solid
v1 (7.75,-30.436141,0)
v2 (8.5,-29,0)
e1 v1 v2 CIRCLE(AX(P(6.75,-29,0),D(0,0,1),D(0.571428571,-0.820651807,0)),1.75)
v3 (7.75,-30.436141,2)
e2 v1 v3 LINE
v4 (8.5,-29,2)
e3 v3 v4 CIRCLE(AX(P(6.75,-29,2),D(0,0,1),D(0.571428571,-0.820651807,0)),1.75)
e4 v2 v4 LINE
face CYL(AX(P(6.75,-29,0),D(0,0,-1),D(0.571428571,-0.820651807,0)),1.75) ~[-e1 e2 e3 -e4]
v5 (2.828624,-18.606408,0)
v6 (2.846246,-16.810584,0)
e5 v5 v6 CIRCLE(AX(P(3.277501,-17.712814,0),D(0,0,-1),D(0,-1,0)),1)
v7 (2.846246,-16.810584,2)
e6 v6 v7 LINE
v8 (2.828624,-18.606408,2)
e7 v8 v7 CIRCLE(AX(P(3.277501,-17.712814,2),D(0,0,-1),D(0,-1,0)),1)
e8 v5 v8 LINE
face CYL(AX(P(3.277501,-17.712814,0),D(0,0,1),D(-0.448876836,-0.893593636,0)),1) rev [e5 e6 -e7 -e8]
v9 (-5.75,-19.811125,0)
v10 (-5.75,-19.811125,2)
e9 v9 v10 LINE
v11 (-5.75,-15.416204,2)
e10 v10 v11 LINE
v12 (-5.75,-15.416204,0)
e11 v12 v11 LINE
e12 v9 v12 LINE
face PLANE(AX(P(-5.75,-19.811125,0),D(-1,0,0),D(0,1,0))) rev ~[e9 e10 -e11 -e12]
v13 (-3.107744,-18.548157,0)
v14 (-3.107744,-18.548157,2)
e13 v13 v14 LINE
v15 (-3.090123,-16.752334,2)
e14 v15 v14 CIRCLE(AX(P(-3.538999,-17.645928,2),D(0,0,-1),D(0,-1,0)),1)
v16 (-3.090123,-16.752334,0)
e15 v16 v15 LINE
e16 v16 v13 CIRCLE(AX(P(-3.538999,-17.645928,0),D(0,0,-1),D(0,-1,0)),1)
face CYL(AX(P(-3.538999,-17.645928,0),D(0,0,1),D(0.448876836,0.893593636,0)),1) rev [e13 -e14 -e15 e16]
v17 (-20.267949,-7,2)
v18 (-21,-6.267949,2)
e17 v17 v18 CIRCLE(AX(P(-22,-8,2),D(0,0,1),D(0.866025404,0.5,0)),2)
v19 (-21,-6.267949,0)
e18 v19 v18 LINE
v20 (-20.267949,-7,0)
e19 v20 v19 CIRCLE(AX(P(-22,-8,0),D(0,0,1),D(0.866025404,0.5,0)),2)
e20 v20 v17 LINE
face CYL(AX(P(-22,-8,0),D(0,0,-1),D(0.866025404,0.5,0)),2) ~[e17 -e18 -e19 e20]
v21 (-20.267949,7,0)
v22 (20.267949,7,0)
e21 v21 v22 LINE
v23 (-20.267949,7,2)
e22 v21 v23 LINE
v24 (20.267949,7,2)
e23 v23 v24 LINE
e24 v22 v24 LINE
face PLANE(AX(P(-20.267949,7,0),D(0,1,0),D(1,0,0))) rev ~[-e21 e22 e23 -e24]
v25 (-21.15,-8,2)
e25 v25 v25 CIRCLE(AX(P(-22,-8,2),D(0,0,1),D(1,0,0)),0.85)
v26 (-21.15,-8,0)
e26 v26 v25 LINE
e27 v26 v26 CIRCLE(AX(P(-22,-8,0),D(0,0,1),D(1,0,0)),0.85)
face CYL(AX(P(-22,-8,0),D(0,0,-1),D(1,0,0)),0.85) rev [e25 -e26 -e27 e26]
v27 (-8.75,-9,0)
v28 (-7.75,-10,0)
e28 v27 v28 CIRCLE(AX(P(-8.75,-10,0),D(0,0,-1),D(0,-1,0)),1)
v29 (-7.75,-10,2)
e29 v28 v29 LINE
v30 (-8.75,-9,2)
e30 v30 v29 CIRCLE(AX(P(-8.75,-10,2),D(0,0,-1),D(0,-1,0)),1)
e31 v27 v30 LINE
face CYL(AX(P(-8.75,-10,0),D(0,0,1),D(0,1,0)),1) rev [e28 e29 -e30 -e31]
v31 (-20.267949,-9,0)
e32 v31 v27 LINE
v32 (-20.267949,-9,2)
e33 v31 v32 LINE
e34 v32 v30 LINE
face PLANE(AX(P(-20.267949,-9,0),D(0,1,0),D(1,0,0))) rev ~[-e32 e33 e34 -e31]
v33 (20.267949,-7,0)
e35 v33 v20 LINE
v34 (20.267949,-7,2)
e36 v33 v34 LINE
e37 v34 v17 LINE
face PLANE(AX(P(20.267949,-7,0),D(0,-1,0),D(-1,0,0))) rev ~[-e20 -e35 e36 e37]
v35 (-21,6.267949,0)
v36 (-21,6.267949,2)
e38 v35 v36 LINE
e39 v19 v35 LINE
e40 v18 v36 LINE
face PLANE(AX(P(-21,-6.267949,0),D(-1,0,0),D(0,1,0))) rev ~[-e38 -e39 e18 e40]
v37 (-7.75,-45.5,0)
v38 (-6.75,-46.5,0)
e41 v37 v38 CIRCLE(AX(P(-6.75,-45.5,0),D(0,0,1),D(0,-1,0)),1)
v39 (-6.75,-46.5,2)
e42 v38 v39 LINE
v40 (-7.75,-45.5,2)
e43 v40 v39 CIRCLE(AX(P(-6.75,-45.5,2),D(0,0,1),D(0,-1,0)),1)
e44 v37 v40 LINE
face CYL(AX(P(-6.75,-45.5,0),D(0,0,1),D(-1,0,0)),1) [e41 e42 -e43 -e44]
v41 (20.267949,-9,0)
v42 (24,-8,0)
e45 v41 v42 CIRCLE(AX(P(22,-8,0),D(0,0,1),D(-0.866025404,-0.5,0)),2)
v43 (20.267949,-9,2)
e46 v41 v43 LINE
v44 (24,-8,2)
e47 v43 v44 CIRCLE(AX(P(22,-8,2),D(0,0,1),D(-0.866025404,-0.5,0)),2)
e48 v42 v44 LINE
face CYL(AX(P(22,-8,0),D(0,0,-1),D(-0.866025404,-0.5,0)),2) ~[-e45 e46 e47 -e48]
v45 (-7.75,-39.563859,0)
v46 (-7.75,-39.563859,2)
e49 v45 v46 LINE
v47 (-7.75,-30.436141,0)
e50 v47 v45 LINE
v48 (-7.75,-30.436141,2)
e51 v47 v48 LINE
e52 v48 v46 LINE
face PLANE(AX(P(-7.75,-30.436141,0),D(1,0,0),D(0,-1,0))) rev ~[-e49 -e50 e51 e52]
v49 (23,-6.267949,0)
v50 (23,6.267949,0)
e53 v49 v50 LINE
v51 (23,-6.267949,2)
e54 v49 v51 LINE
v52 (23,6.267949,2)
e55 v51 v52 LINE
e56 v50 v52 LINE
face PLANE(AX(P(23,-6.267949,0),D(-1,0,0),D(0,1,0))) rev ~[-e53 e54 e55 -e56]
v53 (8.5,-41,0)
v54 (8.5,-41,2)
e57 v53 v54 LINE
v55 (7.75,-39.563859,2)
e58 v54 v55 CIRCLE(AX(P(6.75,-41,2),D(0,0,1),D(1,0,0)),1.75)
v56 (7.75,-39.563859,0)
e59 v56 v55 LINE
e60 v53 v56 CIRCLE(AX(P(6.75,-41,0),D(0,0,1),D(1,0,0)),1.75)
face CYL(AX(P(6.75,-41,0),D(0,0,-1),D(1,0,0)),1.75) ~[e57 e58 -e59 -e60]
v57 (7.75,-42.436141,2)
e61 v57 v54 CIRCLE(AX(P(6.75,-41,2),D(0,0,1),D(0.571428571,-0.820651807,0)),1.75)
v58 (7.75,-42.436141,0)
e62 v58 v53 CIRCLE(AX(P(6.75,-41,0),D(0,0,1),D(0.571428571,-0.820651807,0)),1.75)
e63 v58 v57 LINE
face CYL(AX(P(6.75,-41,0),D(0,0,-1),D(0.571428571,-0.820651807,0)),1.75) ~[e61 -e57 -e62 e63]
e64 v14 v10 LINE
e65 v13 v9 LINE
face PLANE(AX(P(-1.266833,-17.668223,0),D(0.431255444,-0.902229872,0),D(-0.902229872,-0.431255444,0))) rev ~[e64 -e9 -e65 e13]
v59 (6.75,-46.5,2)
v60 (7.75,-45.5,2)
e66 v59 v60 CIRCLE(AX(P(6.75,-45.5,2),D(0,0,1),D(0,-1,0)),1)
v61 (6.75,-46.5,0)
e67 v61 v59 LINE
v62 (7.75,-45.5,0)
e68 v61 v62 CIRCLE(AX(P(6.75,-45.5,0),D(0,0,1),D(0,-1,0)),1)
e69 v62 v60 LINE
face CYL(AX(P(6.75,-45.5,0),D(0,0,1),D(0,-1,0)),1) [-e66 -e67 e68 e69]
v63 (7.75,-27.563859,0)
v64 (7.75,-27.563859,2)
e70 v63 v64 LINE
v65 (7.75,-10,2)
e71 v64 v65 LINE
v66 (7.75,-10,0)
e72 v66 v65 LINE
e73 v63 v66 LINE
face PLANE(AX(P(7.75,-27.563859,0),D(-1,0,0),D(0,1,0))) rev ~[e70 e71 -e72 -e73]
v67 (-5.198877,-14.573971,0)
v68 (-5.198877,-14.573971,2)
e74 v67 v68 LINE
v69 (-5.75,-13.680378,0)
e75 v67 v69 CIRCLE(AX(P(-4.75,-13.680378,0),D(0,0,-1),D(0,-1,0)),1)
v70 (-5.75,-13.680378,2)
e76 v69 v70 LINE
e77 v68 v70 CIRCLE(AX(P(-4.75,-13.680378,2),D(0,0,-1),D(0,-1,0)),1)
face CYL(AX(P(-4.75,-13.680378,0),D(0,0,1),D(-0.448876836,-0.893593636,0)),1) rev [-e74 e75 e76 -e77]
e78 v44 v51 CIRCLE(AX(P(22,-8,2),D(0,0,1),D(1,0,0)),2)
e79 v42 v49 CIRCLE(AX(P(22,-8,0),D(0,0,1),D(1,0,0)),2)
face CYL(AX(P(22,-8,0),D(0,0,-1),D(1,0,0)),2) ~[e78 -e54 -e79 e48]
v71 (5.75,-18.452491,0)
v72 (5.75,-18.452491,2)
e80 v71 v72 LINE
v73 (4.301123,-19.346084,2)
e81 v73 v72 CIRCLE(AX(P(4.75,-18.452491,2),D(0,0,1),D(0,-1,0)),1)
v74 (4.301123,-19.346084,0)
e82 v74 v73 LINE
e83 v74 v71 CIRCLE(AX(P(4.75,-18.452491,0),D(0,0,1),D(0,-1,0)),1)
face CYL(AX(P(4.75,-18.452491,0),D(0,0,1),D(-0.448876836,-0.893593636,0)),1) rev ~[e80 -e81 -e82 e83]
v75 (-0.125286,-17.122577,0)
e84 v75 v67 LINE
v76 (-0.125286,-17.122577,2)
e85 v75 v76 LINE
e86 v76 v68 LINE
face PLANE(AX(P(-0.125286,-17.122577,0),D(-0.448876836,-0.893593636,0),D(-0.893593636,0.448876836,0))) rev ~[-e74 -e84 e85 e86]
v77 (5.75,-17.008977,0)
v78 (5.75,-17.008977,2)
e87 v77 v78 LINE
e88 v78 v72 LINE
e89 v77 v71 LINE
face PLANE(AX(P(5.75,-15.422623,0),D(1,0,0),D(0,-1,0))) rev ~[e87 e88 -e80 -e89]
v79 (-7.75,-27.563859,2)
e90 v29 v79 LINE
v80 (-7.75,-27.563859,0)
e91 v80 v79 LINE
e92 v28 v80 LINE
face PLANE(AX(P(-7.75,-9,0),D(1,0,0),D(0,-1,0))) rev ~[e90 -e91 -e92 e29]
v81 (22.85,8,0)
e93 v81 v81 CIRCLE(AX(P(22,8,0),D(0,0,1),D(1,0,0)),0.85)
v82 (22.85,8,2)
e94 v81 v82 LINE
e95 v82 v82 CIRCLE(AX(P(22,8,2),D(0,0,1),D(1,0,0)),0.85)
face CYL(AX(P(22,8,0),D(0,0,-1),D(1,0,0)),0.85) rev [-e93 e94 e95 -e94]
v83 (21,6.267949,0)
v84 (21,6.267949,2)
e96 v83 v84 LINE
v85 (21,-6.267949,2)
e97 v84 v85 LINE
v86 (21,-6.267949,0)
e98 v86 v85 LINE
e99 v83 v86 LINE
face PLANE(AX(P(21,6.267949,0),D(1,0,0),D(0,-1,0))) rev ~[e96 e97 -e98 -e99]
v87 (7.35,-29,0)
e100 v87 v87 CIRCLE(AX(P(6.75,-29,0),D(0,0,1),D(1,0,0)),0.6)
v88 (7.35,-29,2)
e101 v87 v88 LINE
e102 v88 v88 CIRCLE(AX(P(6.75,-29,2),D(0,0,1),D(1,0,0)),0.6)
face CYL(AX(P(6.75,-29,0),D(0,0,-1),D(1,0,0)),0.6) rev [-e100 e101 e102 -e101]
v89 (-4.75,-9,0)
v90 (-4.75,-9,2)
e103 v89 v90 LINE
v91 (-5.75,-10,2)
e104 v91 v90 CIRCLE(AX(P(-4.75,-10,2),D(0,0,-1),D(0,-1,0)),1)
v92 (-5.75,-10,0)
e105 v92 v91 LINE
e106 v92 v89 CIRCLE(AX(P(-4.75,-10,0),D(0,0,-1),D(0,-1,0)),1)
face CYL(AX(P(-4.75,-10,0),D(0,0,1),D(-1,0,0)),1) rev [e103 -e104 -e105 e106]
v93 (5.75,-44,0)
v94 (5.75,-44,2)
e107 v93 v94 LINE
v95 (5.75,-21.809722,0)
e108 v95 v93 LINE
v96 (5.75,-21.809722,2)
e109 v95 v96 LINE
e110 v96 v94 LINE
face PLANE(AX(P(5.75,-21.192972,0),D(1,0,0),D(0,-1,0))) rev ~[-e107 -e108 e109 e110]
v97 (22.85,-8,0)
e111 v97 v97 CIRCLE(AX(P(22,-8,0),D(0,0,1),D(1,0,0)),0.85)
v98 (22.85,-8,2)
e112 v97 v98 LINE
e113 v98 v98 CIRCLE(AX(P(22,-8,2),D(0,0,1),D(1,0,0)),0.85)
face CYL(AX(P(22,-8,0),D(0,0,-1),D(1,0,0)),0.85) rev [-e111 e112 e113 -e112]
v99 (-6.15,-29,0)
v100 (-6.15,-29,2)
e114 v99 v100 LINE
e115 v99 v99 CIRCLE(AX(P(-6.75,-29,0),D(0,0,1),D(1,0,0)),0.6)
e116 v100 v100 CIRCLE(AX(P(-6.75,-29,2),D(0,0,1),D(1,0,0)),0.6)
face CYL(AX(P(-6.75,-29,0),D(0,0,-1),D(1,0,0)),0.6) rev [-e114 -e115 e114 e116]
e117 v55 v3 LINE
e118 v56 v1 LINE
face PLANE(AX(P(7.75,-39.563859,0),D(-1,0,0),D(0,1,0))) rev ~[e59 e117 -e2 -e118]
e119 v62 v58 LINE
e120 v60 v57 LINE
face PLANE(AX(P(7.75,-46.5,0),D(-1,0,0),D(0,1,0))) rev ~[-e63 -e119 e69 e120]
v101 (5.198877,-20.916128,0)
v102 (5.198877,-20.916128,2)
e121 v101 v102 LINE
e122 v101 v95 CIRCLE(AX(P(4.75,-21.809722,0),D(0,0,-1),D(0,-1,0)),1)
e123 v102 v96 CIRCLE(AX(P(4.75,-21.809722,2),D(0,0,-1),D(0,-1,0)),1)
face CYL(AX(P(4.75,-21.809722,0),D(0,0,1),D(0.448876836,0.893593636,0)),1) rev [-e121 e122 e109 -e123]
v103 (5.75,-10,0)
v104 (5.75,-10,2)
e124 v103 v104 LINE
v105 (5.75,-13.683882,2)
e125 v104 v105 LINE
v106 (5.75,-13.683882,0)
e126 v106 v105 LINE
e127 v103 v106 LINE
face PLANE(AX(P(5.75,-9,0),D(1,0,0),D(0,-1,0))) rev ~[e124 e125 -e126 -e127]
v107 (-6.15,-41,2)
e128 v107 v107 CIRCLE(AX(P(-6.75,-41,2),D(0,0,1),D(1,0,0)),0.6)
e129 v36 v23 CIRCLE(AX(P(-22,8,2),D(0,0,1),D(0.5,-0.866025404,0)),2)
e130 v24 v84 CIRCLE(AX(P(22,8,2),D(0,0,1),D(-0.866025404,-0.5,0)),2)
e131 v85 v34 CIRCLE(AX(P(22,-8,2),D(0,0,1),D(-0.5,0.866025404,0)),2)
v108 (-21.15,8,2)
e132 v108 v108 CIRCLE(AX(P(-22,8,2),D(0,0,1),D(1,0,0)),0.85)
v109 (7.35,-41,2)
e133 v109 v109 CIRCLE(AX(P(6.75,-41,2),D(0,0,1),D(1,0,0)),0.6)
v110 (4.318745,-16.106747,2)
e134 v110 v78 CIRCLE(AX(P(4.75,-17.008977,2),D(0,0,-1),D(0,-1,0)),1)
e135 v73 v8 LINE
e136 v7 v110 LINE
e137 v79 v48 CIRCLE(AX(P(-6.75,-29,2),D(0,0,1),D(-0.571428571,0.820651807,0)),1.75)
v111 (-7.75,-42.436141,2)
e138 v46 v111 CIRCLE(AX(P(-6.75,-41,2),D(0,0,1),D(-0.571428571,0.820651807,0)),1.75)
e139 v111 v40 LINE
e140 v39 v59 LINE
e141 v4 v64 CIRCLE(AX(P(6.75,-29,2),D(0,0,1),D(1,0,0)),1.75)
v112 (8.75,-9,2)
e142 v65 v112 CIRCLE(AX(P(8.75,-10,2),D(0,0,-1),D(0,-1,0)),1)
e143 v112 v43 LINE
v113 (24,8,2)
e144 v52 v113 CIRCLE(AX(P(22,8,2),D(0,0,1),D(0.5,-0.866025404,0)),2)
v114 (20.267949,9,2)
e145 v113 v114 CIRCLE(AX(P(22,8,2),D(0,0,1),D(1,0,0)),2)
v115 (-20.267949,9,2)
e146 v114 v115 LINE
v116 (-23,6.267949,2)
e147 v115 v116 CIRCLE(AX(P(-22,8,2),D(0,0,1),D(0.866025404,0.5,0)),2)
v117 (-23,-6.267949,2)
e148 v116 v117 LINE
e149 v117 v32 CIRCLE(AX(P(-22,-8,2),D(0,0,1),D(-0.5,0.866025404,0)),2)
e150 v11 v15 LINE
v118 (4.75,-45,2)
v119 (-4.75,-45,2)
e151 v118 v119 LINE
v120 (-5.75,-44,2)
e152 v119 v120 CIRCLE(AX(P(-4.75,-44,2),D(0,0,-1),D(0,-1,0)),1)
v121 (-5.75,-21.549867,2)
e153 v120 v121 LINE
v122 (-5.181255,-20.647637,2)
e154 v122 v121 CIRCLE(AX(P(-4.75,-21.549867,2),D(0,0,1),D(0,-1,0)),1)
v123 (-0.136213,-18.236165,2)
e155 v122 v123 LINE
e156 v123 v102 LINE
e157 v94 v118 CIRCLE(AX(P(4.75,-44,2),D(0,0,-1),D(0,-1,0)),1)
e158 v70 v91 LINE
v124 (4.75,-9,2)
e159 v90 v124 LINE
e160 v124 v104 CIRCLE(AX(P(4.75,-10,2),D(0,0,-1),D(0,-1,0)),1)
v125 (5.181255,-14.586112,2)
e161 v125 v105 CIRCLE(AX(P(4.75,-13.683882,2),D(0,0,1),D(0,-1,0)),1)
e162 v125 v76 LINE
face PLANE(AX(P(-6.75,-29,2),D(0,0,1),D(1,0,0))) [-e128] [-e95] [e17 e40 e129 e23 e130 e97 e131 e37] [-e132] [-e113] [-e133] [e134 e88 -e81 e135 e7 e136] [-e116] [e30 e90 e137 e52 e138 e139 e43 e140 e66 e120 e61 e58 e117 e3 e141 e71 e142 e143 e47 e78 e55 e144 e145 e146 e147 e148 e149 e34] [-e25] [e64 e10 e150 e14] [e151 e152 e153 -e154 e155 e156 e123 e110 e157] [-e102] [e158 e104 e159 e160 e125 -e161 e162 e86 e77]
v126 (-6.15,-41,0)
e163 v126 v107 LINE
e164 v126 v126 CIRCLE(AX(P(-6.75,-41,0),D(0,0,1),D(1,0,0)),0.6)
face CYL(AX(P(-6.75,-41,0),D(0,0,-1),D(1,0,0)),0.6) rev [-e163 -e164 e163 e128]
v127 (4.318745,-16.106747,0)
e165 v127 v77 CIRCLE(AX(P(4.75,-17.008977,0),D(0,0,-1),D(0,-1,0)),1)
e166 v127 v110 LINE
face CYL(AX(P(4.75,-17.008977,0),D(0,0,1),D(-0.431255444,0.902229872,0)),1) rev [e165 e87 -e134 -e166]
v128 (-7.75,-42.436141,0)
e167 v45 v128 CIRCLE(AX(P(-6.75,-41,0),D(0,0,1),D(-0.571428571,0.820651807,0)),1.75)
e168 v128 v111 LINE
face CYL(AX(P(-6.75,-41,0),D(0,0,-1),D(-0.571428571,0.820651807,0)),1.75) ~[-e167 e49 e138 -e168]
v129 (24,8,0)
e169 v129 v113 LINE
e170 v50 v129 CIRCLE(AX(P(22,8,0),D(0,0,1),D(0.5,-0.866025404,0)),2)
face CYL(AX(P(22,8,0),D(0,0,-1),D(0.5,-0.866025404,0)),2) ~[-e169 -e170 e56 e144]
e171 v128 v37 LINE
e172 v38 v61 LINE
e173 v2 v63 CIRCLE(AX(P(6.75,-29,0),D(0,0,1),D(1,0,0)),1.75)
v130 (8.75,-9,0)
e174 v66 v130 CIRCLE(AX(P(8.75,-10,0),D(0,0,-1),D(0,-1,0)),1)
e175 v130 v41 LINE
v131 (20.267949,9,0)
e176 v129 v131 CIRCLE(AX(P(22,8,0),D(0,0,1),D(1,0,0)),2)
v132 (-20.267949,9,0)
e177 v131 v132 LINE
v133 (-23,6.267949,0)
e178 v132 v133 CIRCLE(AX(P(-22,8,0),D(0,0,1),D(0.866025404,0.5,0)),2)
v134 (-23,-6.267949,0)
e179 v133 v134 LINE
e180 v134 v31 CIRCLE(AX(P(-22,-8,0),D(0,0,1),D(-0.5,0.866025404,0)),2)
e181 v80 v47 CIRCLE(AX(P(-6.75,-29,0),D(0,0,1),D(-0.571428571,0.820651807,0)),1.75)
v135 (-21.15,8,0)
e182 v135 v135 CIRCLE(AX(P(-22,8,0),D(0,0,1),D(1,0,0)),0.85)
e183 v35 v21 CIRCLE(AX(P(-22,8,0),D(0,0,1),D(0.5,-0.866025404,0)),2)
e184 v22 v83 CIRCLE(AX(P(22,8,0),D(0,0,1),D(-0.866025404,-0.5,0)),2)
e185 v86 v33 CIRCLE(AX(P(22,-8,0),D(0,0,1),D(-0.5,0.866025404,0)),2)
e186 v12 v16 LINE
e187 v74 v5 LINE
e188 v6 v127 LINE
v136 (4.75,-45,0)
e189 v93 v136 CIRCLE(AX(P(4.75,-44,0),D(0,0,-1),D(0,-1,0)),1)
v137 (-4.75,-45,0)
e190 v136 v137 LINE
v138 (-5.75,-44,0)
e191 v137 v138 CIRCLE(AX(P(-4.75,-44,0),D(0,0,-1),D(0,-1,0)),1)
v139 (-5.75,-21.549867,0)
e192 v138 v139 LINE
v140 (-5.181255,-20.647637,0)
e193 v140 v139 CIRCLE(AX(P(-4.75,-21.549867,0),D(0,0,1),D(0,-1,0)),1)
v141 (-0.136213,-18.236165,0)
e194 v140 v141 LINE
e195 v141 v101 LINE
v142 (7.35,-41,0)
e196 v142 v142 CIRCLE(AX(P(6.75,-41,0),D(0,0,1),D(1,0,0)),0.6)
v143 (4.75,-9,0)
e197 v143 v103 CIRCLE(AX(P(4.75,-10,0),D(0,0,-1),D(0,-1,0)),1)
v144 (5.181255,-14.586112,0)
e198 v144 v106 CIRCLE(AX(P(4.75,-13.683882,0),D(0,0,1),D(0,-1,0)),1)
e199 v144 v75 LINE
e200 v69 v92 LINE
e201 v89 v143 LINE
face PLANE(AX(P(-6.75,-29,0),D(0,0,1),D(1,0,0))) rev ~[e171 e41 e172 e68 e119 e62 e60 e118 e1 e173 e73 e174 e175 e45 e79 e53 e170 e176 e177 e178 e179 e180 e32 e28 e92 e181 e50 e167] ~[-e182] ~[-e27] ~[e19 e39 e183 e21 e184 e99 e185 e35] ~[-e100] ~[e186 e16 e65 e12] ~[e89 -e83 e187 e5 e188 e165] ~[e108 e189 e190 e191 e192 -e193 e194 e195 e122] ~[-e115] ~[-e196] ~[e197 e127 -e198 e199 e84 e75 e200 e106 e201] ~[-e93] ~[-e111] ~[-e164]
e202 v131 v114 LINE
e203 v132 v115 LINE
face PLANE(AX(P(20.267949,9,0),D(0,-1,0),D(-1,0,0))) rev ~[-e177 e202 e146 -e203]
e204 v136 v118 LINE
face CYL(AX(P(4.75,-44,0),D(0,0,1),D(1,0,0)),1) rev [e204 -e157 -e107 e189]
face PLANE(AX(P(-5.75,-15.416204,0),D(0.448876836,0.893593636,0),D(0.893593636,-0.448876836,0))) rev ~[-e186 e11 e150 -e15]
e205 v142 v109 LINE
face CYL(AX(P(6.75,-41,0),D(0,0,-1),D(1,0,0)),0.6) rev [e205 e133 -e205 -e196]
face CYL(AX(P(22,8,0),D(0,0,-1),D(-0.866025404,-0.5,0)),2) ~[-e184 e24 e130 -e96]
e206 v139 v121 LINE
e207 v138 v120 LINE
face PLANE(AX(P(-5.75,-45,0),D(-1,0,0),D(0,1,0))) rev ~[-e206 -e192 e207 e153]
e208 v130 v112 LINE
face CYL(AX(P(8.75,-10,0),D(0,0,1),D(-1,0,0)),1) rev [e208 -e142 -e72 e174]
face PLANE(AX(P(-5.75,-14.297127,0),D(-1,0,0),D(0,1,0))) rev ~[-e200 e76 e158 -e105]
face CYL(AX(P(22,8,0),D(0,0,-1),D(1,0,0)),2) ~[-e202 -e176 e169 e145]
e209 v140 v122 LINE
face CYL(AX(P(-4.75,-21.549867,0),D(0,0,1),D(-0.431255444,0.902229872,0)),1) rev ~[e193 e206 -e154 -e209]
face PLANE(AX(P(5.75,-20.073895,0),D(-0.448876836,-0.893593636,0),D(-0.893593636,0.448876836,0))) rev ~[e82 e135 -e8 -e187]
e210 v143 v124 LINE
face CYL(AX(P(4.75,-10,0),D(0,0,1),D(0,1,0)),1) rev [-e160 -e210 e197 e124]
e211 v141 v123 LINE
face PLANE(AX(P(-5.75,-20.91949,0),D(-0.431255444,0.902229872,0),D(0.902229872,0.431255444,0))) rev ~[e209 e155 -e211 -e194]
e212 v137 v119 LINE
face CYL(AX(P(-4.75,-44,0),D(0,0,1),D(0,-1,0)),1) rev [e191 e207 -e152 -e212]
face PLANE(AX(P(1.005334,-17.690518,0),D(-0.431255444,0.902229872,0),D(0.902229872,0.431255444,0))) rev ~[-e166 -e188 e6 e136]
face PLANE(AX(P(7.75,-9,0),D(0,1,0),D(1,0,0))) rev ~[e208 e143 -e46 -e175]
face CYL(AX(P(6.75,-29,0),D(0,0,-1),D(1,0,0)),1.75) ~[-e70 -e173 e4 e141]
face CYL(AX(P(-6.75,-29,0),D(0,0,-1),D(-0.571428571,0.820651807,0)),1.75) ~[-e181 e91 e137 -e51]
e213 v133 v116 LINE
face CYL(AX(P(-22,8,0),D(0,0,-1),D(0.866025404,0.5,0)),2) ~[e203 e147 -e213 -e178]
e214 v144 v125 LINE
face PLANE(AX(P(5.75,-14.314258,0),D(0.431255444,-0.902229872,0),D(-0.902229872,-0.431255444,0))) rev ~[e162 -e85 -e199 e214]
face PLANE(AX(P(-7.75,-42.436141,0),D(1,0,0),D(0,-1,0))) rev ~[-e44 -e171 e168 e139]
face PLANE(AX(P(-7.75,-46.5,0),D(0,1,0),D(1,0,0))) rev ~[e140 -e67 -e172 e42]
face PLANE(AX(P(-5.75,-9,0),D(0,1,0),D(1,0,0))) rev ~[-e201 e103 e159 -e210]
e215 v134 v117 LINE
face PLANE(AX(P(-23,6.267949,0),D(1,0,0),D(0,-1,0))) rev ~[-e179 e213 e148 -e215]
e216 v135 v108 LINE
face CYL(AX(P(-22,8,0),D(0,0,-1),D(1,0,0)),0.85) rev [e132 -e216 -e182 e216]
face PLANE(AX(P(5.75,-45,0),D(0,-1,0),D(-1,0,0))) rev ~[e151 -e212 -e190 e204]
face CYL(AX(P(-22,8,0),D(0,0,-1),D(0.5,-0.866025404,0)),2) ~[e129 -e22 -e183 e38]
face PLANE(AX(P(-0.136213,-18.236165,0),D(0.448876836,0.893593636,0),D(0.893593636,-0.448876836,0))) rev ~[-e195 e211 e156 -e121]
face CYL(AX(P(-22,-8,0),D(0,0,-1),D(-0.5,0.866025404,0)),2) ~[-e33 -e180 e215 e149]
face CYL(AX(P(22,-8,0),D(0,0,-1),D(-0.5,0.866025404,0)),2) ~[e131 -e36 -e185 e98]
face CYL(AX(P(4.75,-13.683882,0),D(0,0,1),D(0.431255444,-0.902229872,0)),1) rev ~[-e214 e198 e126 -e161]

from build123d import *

# Parameters (mm, degrees)
F0_R     = 0.6
F0_R_2   = 0.85
F1_DEPTH = 2
F2_R     = 1


# Not quite as in the source:
# - a feature names something its author has since deleted; it is built from what else it names


with BuildPart() as f1:
    # F0 (on Top) → F1 (new body)
    with BuildSketch(Plane.XY):
        with BuildLine():
            ThreePointArc((-5.75, -27.5638593384), (-6.75, -27.25), (-7.75, -27.5638593384))
            Line((-7.75, -27.5638593384), (-7.75, -30.4361406616))
            ThreePointArc((-7.75, -30.4361406616), (-6.75, -30.75), (-5.75, -30.4361406616))
            Line((-5.75, -30.4361406616), (-5.75, -27.5638593384))
        make_face()
        with Locations((-6.75, -29)):
            Circle(F0_R, mode=Mode.SUBTRACT)
        with BuildLine():
            Line((-7.75, -30.4361406616), (-7.75, -27.5638593384))
            ThreePointArc((-7.75, -27.5638593384), (-8.5, -29), (-7.75, -30.4361406616))
        make_face()
        with BuildLine():
            ThreePointArc((-5.75, -30.4361406616), (-6.75, -30.75), (-7.75, -30.4361406616))
            Line((-7.75, -30.4361406616), (-7.75, -39.5638593384))
            ThreePointArc((-7.75, -39.5638593384), (-6.75, -39.25), (-5.75, -39.5638593384))
            Line((-5.75, -39.5638593384), (-5.75, -30.4361406616))
        make_face()
        with BuildLine():
            Line((-7.75, -42.4361406616), (-7.75, -39.5638593384))
            ThreePointArc((-7.75, -39.5638593384), (-8.5, -41), (-7.75, -42.4361406616))
        make_face()
        with BuildLine():
            ThreePointArc((-5.75, -39.5638593384), (-6.75, -39.25), (-7.75, -39.5638593384))
            Line((-7.75, -39.5638593384), (-7.75, -42.4361406616))
            ThreePointArc((-7.75, -42.4361406616), (-6.75, -42.75), (-5.75, -42.4361406616))
            Line((-5.75, -42.4361406616), (-5.75, -39.5638593384))
        make_face()
        with Locations((-6.75, -41)):
            Circle(F0_R, mode=Mode.SUBTRACT)
        with BuildLine():
            ThreePointArc((-5.75, -42.4361406616), (-6.75, -42.75), (-7.75, -42.4361406616))
            Line((-7.75, -42.4361406616), (-7.75, -46.5))
            Line((-7.75, -46.5), (7.75, -46.5))
            Line((7.75, -46.5), (7.75, -42.4361406616))
            ThreePointArc((7.75, -42.4361406616), (6.75, -42.75), (5.75, -42.4361406616))
            Line((5.75, -42.4361406616), (5.75, -45))
            Line((5.75, -45), (-5.75, -45))
            Line((-5.75, -45), (-5.75, -42.4361406616))
        make_face()
        with BuildLine():
            Line((7.75, -30.4361406616), (7.75, -27.5638593384))
            ThreePointArc((7.75, -27.5638593384), (6.75, -27.25), (5.75, -27.5638593384))
            Line((5.75, -27.5638593384), (5.75, -30.4361406616))
            ThreePointArc((5.75, -30.4361406616), (6.75, -30.75), (7.75, -30.4361406616))
        make_face()
        with Locations((6.75, -29)):
            Circle(F0_R, mode=Mode.SUBTRACT)
        with BuildLine():
            ThreePointArc((8.5, -29), (8.3012092057, -28.1899074127), (7.75, -27.5638593384))
            Line((7.75, -27.5638593384), (7.75, -30.4361406616))
            ThreePointArc((7.75, -30.4361406616), (8.3012092057, -29.8100925873), (8.5, -29))
        make_face()
        with BuildLine():
            Line((7.75, -39.5638593384), (7.75, -30.4361406616))
            ThreePointArc((7.75, -30.4361406616), (6.75, -30.75), (5.75, -30.4361406616))
            Line((5.75, -30.4361406616), (5.75, -39.5638593384))
            ThreePointArc((5.75, -39.5638593384), (6.75, -39.25), (7.75, -39.5638593384))
        make_face()
        with BuildLine():
            Line((7.75, -42.4361406616), (7.75, -39.5638593384))
            ThreePointArc((7.75, -39.5638593384), (6.75, -39.25), (5.75, -39.5638593384))
            Line((5.75, -39.5638593384), (5.75, -42.4361406616))
            ThreePointArc((5.75, -42.4361406616), (6.75, -42.75), (7.75, -42.4361406616))
        make_face()
        with Locations((6.75, -41)):
            Circle(F0_R, mode=Mode.SUBTRACT)
        with BuildLine():
            ThreePointArc((8.5, -41), (8.3012092057, -40.1899074127), (7.75, -39.5638593384))
            Line((7.75, -39.5638593384), (7.75, -42.4361406616))
            ThreePointArc((7.75, -42.4361406616), (8.3012092057, -41.8100925873), (8.5, -41))
        make_face()
        with BuildLine():
            ThreePointArc((-20, -8), (-20.0681483474, -8.5176380902), (-20.2679491924, -9))
            Line((-20.2679491924, -9), (-7.75, -9))
            Line((-7.75, -9), (-5.75, -9))
            Line((-5.75, -9), (5.75, -9))
            Line((5.75, -9), (7.75, -9))
            Line((7.75, -9), (20.2679491924, -9))
            ThreePointArc((20.2679491924, -9), (20, -8), (20.2679491924, -7))
            Line((20.2679491924, -7), (-20.2679491924, -7))
            ThreePointArc((-20.2679491924, -7), (-20.0681483474, -7.4823619098), (-20, -8))
        make_face()
        with BuildLine():
            ThreePointArc((24, -8), (23.7320508076, -7), (23, -6.2679491924))
            Line((23, -6.2679491924), (23, -9))
            Line((23, -9), (20.2679491924, -9))
            ThreePointArc((20.2679491924, -9), (22.5176380902, -9.9318516526), (24, -8))
        make_face()
        with BuildLine():
            ThreePointArc((23, -6.2679491924), (22, -6), (21, -6.2679491924))
            Line((21, -6.2679491924), (21, -7))
            Line((21, -7), (20.2679491924, -7))
            ThreePointArc((20.2679491924, -7), (20, -8), (20.2679491924, -9))
            Line((20.2679491924, -9), (23, -9))
            Line((23, -9), (23, -6.2679491924))
        make_face()
        with Locations((22, -8)):
            Circle(F0_R_2, mode=Mode.SUBTRACT)
        with BuildLine():
            ThreePointArc((23, 6.2679491924), (22, 6), (21, 6.2679491924))
            Line((21, 6.2679491924), (21, -6.2679491924))
            ThreePointArc((21, -6.2679491924), (22, -6), (23, -6.2679491924))
            Line((23, -6.2679491924), (23, 6.2679491924))
        make_face()
        with BuildLine():
            Line((21, -7), (21, -6.2679491924))
            ThreePointArc((21, -6.2679491924), (20.5857864376, -6.5857864376), (20.2679491924, -7))
            Line((20.2679491924, -7), (21, -7))
        make_face()
        with BuildLine():
            Line((21, 7), (20.2679491924, 7))
            ThreePointArc((20.2679491924, 7), (20.5857864376, 6.5857864376), (21, 6.2679491924))
            Line((21, 6.2679491924), (21, 7))
        make_face()
        with BuildLine():
            Line((23, 9), (20.2679491924, 9))
            ThreePointArc((20.2679491924, 9), (20, 8), (20.2679491924, 7))
            Line((20.2679491924, 7), (21, 7))
            Line((21, 7), (21, 6.2679491924))
            ThreePointArc((21, 6.2679491924), (22, 6), (23, 6.2679491924))
            Line((23, 6.2679491924), (23, 9))
        make_face()
        with Locations((22, 8)):
            Circle(F0_R_2, mode=Mode.SUBTRACT)
        with BuildLine():
            ThreePointArc((24, 8), (22.5176380902, 9.9318516526), (20.2679491924, 9))
            Line((20.2679491924, 9), (23, 9))
            Line((23, 9), (23, 6.2679491924))
            ThreePointArc((23, 6.2679491924), (23.7320508076, 7), (24, 8))
        make_face()
        with BuildLine():
            ThreePointArc((-20.2679491924, 9), (-20.0681483474, 8.5176380902), (-20, 8))
            ThreePointArc((-20, 8), (-20.0681483474, 7.4823619098), (-20.2679491924, 7))
            Line((-20.2679491924, 7), (20.2679491924, 7))
            ThreePointArc((20.2679491924, 7), (20, 8), (20.2679491924, 9))
            Line((20.2679491924, 9), (-20.2679491924, 9))
        make_face()
        with BuildLine():
            ThreePointArc((-21, -6.2679491924), (-22, -6), (-23, -6.2679491924))
            Line((-23, -6.2679491924), (-23, -9))
            Line((-23, -9), (-20.2679491924, -9))
            ThreePointArc((-20.2679491924, -9), (-20.0681483474, -8.5176380902), (-20, -8))
            ThreePointArc((-20, -8), (-20.0681483474, -7.4823619098), (-20.2679491924, -7))
            Line((-20.2679491924, -7), (-21, -7))
            Line((-21, -7), (-21, -6.2679491924))
        make_face()
        with Locations((-22, -8)):
            Circle(F0_R_2, mode=Mode.SUBTRACT)
        with BuildLine():
            Line((-23, -9), (-23, -6.2679491924))
            ThreePointArc((-23, -6.2679491924), (-23.4142135624, -9.4142135624), (-20.2679491924, -9))
            Line((-20.2679491924, -9), (-23, -9))
        make_face()
        with BuildLine():
            ThreePointArc((-20.2679491924, -7), (-20.5857864376, -6.5857864376), (-21, -6.2679491924))
            Line((-21, -6.2679491924), (-21, -7))
            Line((-21, -7), (-20.2679491924, -7))
        make_face()
        with BuildLine():
            Line((-23, 9), (-20.2679491924, 9))
            ThreePointArc((-20.2679491924, 9), (-23.4142135624, 9.4142135624), (-23, 6.2679491924))
            Line((-23, 6.2679491924), (-23, 9))
        make_face()
        with BuildLine():
            ThreePointArc((-20.2679491924, 7), (-20.0681483474, 7.4823619098), (-20, 8))
            ThreePointArc((-20, 8), (-20.0681483474, 8.5176380902), (-20.2679491924, 9))
            Line((-20.2679491924, 9), (-23, 9))
            Line((-23, 9), (-23, 6.2679491924))
            ThreePointArc((-23, 6.2679491924), (-22, 6), (-21, 6.2679491924))
            Line((-21, 6.2679491924), (-21, 7))
            Line((-21, 7), (-20.2679491924, 7))
        make_face()
        with Locations((-22, 8)):
            Circle(F0_R_2, mode=Mode.SUBTRACT)
        with BuildLine():
            ThreePointArc((-21, 6.2679491924), (-20.5857864376, 6.5857864376), (-20.2679491924, 7))
            Line((-20.2679491924, 7), (-21, 7))
            Line((-21, 7), (-21, 6.2679491924))
        make_face()
        with BuildLine():
            ThreePointArc((-21, 6.2679491924), (-22, 6), (-23, 6.2679491924))
            Line((-23, 6.2679491924), (-23, -6.2679491924))
            ThreePointArc((-23, -6.2679491924), (-22, -6), (-21, -6.2679491924))
            Line((-21, -6.2679491924), (-21, 6.2679491924))
        make_face()
        with BuildLine():
            Line((7.75, -9), (5.75, -9))
            Line((5.75, -9), (5.75, -14.3142581873))
            Line((5.75, -14.3142581873), (5.75, -15.422623174))
            Line((5.75, -15.422623174), (5.75, -20.073895466))
            Line((5.75, -20.073895466), (5.75, -21.1929723705))
            Line((5.75, -21.1929723705), (5.75, -27.5638593384))
            ThreePointArc((5.75, -27.5638593384), (6.75, -27.25), (7.75, -27.5638593384))
            Line((7.75, -27.5638593384), (7.75, -9))
        make_face()
        Polygon((5.75, -20.073895466), (1.0053343494, -17.6905184824), (-0.1362126115, -18.2361647275), (5.75, -21.1929723705), align=None)
        Polygon((5.75, -15.422623174), (5.75, -14.3142581873), (-0.125285608, -17.1225767595), (1.0053343494, -17.6905184824), align=None)
        Polygon((1.0053343494, -17.6905184824), (-0.125285608, -17.1225767595), (-1.2668325689, -17.6682230047), (-0.1362126115, -18.2361647275), align=None)
        Polygon((-5.75, -19.8111251883), (-5.75, -20.9194901751), (-0.1362126115, -18.2361647275), (-1.2668325689, -17.6682230047), align=None)
        Polygon((-0.125285608, -17.1225767595), (-5.75, -14.2971269157), (-5.75, -15.4162038202), (-1.2668325689, -17.6682230047), align=None)
        with BuildLine():
            Line((-5.75, -9), (-7.75, -9))
            Line((-7.75, -9), (-7.75, -27.5638593384))
            ThreePointArc((-7.75, -27.5638593384), (-6.75, -27.25), (-5.75, -27.5638593384))
            Line((-5.75, -27.5638593384), (-5.75, -20.9194901751))
            Line((-5.75, -20.9194901751), (-5.75, -19.8111251883))
            Line((-5.75, -19.8111251883), (-5.75, -15.4162038202))
            Line((-5.75, -15.4162038202), (-5.75, -14.2971269157))
            Line((-5.75, -14.2971269157), (-5.75, -9))
        make_face()
    extrude(amount=F1_DEPTH)

    # F2
    f2_edges = [f1.edges().sort_by_distance(p)[0] for p in [
        (-7.75, -46.5, 1),
        (7.75, -46.5, 1),
        (-5.75, -45, 1),
        (5.75, -45, 1),
        (-5.75, -20.91949, 1),
        (5.75, -21.192972, 1),
        (5.75, -20.073895, 1),
        (5.75, -15.422623, 1),
        (1.005334, -17.690518, 1),
        (-1.266833, -17.668223, 1),
        (-5.75, -14.297127, 1),
        (5.75, -14.314258, 1),
        (5.75, -9, 1),
        (-5.75, -9, 1),
        (-7.75, -9, 1),
        (7.75, -9, 1),
    ]]
    fillet(f2_edges, radius=F2_R)


solid = f1.part
